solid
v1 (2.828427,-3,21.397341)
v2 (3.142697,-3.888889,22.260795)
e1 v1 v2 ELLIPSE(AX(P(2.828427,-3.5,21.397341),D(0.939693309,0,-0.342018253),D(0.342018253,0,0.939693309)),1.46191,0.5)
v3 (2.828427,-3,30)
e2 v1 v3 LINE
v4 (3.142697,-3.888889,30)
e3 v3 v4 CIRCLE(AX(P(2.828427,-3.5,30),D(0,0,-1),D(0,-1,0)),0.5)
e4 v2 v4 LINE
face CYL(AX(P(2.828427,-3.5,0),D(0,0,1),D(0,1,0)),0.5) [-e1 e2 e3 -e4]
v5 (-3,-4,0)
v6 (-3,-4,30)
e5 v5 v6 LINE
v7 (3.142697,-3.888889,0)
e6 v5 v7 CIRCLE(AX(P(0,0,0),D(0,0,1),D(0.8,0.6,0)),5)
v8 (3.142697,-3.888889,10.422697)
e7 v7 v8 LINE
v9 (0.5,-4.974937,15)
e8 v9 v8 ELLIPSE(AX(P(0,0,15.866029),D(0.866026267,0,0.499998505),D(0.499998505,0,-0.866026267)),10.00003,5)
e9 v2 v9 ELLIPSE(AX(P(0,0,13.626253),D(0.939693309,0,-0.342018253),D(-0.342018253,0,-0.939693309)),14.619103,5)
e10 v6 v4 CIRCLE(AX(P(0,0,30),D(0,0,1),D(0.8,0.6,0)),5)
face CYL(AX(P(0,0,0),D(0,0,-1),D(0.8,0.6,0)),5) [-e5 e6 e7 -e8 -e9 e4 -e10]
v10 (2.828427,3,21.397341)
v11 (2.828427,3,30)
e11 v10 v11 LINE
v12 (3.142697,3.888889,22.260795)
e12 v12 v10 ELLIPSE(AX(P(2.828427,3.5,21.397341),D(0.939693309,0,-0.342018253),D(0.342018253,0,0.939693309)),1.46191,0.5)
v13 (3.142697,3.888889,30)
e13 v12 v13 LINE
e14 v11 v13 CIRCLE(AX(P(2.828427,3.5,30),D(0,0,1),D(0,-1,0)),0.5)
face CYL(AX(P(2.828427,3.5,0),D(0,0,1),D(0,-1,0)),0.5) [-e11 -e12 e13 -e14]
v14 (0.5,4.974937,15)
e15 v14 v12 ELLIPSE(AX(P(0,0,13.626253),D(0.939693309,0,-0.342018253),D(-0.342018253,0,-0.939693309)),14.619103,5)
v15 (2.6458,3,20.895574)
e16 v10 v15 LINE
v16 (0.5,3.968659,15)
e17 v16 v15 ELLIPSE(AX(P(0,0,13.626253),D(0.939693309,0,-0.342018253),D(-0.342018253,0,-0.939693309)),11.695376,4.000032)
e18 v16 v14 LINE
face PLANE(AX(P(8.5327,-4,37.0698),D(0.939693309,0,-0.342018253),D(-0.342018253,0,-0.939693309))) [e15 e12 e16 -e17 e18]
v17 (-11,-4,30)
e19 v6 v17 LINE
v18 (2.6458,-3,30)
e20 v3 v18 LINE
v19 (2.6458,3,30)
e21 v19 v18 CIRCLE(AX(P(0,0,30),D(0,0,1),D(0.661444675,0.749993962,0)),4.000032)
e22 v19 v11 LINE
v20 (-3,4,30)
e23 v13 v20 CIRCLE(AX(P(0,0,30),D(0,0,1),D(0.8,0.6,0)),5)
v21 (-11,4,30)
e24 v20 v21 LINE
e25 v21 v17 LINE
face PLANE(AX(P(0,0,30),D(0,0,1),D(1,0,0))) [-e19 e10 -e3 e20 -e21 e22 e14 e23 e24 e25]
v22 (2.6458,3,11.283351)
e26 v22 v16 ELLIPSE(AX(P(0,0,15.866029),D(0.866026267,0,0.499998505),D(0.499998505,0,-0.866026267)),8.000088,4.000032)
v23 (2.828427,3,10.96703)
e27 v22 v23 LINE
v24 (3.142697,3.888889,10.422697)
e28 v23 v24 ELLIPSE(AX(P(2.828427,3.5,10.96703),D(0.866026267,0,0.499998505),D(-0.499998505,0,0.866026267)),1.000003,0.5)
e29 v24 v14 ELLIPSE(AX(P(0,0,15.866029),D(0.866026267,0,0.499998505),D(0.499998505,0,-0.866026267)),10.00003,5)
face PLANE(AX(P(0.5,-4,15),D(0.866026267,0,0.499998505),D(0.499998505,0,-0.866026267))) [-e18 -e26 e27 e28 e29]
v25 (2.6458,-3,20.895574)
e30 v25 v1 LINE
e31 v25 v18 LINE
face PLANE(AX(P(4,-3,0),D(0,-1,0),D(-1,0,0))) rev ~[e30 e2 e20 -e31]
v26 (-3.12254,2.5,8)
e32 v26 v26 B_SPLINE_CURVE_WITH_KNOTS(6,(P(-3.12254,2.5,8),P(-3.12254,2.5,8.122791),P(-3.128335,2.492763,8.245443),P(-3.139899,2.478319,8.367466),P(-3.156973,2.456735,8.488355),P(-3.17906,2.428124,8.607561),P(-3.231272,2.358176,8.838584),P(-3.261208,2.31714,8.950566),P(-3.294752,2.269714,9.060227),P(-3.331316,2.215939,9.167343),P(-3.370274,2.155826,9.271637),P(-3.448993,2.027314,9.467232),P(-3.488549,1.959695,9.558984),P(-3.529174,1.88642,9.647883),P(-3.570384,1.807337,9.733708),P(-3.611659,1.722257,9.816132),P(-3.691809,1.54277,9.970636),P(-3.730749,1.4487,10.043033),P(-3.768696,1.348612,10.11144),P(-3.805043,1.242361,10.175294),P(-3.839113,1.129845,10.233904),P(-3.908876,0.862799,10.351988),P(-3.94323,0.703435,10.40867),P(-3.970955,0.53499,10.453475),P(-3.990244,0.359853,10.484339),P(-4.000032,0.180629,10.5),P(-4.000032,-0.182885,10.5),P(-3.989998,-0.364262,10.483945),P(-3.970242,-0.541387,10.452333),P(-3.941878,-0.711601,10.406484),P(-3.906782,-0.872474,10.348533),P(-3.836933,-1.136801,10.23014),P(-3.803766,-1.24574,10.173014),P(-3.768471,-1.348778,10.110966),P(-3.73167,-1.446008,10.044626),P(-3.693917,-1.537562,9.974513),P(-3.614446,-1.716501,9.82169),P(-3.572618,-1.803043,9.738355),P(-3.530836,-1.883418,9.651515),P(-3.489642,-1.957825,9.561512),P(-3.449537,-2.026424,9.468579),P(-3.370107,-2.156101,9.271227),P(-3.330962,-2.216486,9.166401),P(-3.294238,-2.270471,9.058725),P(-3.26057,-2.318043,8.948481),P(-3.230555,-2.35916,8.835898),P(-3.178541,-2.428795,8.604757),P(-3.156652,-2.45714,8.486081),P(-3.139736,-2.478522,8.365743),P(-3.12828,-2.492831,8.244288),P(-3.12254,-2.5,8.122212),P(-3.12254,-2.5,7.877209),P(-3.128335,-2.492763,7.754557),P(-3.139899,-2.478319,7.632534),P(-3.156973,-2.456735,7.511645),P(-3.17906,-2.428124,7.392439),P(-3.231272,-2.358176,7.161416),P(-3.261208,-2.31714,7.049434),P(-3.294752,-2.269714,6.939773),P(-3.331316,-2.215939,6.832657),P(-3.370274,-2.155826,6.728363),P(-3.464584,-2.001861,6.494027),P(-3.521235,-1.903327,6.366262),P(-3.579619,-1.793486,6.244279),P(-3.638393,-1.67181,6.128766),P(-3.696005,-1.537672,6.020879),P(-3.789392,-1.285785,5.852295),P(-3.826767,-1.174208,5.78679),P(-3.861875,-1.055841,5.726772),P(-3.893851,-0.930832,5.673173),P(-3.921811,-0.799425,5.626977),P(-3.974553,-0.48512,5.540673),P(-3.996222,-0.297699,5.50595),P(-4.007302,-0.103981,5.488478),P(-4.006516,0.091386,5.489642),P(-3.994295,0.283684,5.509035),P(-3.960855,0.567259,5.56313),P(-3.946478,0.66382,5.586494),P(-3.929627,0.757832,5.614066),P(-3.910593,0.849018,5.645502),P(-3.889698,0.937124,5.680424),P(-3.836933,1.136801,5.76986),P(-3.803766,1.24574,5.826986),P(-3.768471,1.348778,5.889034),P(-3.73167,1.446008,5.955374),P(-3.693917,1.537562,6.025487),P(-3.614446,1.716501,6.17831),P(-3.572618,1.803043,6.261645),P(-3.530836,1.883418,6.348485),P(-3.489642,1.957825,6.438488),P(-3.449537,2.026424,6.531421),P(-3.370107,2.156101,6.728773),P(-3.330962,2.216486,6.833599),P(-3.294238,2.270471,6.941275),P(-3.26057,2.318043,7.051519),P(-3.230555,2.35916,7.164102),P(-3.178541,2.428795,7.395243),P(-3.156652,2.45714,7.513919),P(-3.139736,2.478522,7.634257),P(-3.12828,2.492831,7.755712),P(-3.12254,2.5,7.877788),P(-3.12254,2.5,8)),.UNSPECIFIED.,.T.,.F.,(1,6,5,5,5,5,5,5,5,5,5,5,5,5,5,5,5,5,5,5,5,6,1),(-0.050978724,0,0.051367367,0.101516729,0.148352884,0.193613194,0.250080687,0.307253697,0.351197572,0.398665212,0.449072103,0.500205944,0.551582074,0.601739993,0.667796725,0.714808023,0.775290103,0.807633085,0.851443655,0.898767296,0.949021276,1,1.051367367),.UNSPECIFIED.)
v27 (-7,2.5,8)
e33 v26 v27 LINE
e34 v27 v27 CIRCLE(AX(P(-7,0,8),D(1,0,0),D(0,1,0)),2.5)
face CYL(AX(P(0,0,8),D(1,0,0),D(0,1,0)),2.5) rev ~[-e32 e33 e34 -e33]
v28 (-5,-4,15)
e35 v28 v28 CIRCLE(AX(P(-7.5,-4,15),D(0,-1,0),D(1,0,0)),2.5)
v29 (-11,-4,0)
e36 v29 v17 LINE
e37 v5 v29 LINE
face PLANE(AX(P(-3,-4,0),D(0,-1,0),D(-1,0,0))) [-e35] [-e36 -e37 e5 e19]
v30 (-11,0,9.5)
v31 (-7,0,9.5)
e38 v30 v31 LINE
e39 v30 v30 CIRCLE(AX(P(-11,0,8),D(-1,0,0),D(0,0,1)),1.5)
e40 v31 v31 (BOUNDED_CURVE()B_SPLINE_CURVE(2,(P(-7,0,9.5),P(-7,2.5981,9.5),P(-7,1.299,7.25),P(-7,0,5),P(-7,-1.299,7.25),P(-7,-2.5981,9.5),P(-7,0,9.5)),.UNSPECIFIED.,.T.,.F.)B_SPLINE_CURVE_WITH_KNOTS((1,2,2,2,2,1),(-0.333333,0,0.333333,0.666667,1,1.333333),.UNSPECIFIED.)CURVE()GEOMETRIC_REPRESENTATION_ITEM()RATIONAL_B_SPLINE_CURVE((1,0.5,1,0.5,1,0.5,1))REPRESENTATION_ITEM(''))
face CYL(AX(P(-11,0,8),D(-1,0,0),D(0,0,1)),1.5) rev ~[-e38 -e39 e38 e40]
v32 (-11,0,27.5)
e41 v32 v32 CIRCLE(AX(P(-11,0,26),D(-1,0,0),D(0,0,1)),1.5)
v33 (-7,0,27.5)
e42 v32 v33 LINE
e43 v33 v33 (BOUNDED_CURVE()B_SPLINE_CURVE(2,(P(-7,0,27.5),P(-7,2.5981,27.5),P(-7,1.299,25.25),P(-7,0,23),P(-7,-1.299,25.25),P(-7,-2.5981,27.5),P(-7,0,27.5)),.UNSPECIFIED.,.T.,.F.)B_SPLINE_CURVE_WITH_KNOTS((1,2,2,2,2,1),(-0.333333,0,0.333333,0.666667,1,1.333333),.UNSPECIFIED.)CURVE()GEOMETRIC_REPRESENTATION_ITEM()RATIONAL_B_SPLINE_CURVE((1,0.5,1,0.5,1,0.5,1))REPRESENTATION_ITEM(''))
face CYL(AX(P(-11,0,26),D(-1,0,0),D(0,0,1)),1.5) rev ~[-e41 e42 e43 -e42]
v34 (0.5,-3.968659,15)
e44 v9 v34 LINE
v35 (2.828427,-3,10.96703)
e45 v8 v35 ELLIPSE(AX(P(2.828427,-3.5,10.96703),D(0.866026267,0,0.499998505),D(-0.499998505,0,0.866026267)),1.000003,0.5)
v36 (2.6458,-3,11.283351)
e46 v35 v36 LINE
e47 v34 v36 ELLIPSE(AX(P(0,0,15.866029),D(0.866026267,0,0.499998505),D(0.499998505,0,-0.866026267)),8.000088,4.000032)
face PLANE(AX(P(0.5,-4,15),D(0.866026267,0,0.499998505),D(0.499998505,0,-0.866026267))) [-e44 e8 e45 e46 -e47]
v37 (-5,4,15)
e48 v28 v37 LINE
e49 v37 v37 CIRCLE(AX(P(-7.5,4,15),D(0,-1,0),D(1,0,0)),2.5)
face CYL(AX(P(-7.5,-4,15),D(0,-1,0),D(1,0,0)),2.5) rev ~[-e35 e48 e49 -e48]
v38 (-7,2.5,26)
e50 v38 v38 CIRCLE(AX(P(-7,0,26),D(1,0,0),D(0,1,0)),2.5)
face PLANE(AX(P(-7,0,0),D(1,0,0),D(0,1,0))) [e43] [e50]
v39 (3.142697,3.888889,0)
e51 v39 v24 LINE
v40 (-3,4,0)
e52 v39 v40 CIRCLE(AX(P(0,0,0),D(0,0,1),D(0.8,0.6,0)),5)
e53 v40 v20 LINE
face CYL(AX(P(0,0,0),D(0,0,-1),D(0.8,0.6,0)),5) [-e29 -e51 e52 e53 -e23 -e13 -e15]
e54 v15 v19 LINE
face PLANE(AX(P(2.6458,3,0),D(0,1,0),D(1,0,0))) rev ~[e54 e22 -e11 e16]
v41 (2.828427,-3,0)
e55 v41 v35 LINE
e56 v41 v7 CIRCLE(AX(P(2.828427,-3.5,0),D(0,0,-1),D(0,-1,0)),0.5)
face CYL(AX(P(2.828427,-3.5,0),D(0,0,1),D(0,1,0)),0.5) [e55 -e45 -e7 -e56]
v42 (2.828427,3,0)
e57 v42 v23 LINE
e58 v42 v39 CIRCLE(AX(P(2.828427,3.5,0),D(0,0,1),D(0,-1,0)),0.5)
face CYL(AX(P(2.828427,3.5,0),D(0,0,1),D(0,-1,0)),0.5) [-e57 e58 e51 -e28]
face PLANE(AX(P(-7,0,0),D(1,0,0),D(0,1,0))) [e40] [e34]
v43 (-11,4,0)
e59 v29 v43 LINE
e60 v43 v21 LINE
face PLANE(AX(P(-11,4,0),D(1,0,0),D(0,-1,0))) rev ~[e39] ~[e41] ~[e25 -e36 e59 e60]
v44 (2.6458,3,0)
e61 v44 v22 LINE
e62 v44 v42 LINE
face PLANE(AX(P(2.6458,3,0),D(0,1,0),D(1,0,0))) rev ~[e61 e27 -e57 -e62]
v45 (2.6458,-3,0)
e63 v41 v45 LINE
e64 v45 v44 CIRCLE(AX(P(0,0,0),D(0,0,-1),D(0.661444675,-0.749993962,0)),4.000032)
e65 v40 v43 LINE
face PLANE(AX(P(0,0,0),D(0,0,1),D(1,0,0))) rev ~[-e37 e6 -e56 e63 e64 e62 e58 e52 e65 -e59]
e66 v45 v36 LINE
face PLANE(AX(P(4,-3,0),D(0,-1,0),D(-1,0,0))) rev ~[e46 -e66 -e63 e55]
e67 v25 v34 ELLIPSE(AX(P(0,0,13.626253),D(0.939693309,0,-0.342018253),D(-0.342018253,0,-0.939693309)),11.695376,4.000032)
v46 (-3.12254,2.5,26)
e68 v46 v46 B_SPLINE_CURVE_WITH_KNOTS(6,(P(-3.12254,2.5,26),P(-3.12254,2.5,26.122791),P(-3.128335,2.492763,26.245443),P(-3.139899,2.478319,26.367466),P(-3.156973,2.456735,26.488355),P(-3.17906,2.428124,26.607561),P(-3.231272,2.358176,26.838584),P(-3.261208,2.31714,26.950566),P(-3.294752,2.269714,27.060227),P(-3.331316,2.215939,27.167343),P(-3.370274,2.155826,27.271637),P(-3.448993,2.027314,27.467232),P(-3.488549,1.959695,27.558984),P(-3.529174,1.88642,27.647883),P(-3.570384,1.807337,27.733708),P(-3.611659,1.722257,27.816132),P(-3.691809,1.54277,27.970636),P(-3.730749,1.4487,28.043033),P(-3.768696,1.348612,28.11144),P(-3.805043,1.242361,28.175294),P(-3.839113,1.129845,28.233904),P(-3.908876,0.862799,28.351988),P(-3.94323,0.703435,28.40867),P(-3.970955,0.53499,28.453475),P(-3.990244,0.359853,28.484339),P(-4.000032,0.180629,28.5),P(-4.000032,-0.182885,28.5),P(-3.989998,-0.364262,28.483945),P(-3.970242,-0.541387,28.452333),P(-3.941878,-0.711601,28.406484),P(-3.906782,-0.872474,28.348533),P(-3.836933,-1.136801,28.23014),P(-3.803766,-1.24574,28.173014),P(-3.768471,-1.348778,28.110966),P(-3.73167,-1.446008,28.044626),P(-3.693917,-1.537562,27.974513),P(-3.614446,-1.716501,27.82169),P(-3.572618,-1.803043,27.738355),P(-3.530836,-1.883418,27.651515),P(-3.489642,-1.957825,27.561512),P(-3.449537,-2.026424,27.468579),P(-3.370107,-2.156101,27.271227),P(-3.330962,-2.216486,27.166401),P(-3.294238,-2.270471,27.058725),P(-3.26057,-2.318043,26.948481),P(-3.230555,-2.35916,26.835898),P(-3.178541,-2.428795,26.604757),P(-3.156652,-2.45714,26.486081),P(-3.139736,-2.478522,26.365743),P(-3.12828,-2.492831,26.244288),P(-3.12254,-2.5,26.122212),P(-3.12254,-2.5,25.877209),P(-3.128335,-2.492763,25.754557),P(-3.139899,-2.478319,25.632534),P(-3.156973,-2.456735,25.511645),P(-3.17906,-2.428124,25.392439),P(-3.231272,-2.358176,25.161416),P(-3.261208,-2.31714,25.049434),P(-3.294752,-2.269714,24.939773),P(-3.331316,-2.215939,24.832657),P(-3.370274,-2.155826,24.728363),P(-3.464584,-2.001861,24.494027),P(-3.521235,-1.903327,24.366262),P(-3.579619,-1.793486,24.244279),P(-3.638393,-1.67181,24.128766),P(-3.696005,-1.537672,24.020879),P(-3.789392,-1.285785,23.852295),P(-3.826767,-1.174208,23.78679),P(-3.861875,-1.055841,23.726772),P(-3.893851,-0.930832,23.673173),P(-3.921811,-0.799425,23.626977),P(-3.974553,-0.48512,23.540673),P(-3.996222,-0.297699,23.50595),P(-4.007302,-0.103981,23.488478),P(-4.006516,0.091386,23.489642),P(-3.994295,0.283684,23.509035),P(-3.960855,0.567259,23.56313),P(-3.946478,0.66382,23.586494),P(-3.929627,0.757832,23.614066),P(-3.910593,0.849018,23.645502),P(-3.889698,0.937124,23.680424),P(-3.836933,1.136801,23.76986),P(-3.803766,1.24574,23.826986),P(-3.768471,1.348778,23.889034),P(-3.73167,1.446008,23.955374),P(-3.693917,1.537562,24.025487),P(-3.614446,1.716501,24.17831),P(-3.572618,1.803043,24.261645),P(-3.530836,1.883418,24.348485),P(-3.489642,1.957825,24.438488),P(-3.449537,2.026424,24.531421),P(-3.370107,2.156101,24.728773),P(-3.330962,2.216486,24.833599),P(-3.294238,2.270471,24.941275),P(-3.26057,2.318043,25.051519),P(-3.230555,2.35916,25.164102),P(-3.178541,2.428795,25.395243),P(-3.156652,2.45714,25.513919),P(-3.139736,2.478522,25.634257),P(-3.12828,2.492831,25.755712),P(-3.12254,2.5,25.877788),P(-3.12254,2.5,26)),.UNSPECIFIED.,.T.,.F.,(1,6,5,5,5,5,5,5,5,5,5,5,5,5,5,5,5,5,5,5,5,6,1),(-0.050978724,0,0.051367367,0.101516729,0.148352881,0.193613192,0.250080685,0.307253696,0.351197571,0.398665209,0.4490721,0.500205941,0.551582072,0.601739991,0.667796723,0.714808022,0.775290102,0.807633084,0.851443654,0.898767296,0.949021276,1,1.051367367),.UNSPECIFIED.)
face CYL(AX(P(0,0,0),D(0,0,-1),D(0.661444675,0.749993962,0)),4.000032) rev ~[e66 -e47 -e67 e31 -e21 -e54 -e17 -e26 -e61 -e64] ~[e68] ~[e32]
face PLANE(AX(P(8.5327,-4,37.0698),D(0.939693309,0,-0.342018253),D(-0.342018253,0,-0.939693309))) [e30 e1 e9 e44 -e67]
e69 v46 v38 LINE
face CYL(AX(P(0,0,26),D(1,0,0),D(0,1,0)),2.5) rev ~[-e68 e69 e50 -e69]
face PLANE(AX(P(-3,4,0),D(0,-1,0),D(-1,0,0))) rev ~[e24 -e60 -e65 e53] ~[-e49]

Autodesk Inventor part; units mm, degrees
ref_plane "YZ Plane" through (0, 0, 0) normal (1, 0, 0) x (0, 1, 0)
ref_plane "XZ Plane" through (0, 0, 0) normal (0, 1, 0) x (-1, 0, 0)
ref_plane "XY Plane" through (0, 0, 0) normal (0, 0, 1) x (1, 0, 0)
sketch "Sketch1" plane through (0, 0, 0) normal (0, 0, 1) x (1, 0, 0)
  arc A0 (2.6458, 3) -> (2.6458, -3) centre (0, 0) ccw
  arc A1 (4, 3) -> (4, -3) centre (0, 0) ccw
  line L0 (-4, -3) -> (-11, -3)
  line L1 (-11, -3) -> (-11, 3)
  line L2 (-11, 3) -> (-4, 3)
  line L3 (-4, 3) -> (-4, -3)
  line L4 (2.6458, 3) -> (4, 3)
  line L5 (4, 3) -> (4, -3) construction
  line L6 (4, -3) -> (2.6458, -3)
  line L7 (2.6458, -3) -> (2.6458, 3) construction
  line L8 (-11, 3) -> (-3, 3)
  line L9 (-3, 3) -> (-3, 4)
  line L10 (-3, 4) -> (-11, 4)
  line L11 (-11, 4) -> (-11, 3)
  line L12 (-11, -3) -> (-3, -3)
  line L13 (-3, -3) -> (-3, -4)
  line L14 (-3, -4) -> (-11, -4)
  line L15 (-11, -4) -> (-11, -3)
  point P0 (2.6458, 0)
  dimension "d0" = 8
  dimension "d1" = 10
  dimension "d3" = 6
  dimension "d24" = 11
  dimension "d25" = 1
  dimension "d26" = 1
extrude "Extrusion1" add sketch "Sketch1" along normal blind 30
sketch "Sketch2" plane through (-11, -4, 0) normal (-1, 0, 0) x (0, 0, 1)
  circle A0 centre (8, 4) radius 1.5
  circle A1 centre (26, 4) radius 1.5
  line L0 (0, 8) -> (0, 0) projected
  point P0 (0, 4)
  dimension "d6" = 3
  dimension "d9" = 3
  dimension "d10" = 18
extrude "Extrusion2" cut sketch "Sketch2" against normal blind 10
fillet "Fillet1" radius 0.5 2 edges at (4, 3, 15) (4, -3, 15)
sketch "Sketch3" plane through (-11, -4, 0) normal (0, -1, 0) x (1, 0, 0)
  circle A0 centre (3.5, 15) radius 2.5
  line L0 (0, 0) -> (0, 30)
  line L1 (0, 0) -> (7, 0)
  line L2 (19.5327, 37.0698) -> (11.5, 15)
  line L3 (19.5327, 37.0698) -> (43.0189, 37.0698) construction
  line L4 (11.5, 15) -> (19.5327, 1.0869)
  line L5 (19.5327, 1.0869) -> (19.5327, 37.0698)
  point P0 (11, 0)
  point P1 (0, 15)
  point P2 (3.5, 0)
  dimension "d14" = 5
  dimension "d17" = 110
  dimension "d18" = 130
  dimension "d19" = 8
extrude "Extrusion3" cut sketch "Sketch3" along normal through all both and the other way through all
sketch "Sketch4" plane through (0, 0, 0) normal (1, 0, 0) x (0, 1, 0)
  spline S0 degree 2 poles (0, 9.5) (2.5981, 9.5) (1.299, 7.25) (0, 5) (-1.299, 7.25) (-2.5981, 9.5) (0, 9.5) knots 0 0 0 0.333333 0.333333 0.666667 0.666667 1 1 1 weights 1 0.5 1 0.5 1 0.5 1 projected
  spline S1 degree 2 poles (0, 27.5) (2.5981, 27.5) (1.299, 25.25) (0, 23) (-1.299, 25.25) (-2.5981, 27.5) (0, 27.5) knots 0 0 0 0.333333 0.333333 0.666667 0.666667 1 1 1 weights 1 0.5 1 0.5 1 0.5 1 projected
  circle A0 centre (0, 26) radius 2.5
  circle A1 centre (0, 8) radius 2.5
  point P0 (0, 0)
  dimension "d20" = 5
  dimension "d21" = 5
extrude "Extrusion4" cut sketch "Sketch4" against normal blind 7
equation "\"d26\" = d25"
properties part number "brush clip"
